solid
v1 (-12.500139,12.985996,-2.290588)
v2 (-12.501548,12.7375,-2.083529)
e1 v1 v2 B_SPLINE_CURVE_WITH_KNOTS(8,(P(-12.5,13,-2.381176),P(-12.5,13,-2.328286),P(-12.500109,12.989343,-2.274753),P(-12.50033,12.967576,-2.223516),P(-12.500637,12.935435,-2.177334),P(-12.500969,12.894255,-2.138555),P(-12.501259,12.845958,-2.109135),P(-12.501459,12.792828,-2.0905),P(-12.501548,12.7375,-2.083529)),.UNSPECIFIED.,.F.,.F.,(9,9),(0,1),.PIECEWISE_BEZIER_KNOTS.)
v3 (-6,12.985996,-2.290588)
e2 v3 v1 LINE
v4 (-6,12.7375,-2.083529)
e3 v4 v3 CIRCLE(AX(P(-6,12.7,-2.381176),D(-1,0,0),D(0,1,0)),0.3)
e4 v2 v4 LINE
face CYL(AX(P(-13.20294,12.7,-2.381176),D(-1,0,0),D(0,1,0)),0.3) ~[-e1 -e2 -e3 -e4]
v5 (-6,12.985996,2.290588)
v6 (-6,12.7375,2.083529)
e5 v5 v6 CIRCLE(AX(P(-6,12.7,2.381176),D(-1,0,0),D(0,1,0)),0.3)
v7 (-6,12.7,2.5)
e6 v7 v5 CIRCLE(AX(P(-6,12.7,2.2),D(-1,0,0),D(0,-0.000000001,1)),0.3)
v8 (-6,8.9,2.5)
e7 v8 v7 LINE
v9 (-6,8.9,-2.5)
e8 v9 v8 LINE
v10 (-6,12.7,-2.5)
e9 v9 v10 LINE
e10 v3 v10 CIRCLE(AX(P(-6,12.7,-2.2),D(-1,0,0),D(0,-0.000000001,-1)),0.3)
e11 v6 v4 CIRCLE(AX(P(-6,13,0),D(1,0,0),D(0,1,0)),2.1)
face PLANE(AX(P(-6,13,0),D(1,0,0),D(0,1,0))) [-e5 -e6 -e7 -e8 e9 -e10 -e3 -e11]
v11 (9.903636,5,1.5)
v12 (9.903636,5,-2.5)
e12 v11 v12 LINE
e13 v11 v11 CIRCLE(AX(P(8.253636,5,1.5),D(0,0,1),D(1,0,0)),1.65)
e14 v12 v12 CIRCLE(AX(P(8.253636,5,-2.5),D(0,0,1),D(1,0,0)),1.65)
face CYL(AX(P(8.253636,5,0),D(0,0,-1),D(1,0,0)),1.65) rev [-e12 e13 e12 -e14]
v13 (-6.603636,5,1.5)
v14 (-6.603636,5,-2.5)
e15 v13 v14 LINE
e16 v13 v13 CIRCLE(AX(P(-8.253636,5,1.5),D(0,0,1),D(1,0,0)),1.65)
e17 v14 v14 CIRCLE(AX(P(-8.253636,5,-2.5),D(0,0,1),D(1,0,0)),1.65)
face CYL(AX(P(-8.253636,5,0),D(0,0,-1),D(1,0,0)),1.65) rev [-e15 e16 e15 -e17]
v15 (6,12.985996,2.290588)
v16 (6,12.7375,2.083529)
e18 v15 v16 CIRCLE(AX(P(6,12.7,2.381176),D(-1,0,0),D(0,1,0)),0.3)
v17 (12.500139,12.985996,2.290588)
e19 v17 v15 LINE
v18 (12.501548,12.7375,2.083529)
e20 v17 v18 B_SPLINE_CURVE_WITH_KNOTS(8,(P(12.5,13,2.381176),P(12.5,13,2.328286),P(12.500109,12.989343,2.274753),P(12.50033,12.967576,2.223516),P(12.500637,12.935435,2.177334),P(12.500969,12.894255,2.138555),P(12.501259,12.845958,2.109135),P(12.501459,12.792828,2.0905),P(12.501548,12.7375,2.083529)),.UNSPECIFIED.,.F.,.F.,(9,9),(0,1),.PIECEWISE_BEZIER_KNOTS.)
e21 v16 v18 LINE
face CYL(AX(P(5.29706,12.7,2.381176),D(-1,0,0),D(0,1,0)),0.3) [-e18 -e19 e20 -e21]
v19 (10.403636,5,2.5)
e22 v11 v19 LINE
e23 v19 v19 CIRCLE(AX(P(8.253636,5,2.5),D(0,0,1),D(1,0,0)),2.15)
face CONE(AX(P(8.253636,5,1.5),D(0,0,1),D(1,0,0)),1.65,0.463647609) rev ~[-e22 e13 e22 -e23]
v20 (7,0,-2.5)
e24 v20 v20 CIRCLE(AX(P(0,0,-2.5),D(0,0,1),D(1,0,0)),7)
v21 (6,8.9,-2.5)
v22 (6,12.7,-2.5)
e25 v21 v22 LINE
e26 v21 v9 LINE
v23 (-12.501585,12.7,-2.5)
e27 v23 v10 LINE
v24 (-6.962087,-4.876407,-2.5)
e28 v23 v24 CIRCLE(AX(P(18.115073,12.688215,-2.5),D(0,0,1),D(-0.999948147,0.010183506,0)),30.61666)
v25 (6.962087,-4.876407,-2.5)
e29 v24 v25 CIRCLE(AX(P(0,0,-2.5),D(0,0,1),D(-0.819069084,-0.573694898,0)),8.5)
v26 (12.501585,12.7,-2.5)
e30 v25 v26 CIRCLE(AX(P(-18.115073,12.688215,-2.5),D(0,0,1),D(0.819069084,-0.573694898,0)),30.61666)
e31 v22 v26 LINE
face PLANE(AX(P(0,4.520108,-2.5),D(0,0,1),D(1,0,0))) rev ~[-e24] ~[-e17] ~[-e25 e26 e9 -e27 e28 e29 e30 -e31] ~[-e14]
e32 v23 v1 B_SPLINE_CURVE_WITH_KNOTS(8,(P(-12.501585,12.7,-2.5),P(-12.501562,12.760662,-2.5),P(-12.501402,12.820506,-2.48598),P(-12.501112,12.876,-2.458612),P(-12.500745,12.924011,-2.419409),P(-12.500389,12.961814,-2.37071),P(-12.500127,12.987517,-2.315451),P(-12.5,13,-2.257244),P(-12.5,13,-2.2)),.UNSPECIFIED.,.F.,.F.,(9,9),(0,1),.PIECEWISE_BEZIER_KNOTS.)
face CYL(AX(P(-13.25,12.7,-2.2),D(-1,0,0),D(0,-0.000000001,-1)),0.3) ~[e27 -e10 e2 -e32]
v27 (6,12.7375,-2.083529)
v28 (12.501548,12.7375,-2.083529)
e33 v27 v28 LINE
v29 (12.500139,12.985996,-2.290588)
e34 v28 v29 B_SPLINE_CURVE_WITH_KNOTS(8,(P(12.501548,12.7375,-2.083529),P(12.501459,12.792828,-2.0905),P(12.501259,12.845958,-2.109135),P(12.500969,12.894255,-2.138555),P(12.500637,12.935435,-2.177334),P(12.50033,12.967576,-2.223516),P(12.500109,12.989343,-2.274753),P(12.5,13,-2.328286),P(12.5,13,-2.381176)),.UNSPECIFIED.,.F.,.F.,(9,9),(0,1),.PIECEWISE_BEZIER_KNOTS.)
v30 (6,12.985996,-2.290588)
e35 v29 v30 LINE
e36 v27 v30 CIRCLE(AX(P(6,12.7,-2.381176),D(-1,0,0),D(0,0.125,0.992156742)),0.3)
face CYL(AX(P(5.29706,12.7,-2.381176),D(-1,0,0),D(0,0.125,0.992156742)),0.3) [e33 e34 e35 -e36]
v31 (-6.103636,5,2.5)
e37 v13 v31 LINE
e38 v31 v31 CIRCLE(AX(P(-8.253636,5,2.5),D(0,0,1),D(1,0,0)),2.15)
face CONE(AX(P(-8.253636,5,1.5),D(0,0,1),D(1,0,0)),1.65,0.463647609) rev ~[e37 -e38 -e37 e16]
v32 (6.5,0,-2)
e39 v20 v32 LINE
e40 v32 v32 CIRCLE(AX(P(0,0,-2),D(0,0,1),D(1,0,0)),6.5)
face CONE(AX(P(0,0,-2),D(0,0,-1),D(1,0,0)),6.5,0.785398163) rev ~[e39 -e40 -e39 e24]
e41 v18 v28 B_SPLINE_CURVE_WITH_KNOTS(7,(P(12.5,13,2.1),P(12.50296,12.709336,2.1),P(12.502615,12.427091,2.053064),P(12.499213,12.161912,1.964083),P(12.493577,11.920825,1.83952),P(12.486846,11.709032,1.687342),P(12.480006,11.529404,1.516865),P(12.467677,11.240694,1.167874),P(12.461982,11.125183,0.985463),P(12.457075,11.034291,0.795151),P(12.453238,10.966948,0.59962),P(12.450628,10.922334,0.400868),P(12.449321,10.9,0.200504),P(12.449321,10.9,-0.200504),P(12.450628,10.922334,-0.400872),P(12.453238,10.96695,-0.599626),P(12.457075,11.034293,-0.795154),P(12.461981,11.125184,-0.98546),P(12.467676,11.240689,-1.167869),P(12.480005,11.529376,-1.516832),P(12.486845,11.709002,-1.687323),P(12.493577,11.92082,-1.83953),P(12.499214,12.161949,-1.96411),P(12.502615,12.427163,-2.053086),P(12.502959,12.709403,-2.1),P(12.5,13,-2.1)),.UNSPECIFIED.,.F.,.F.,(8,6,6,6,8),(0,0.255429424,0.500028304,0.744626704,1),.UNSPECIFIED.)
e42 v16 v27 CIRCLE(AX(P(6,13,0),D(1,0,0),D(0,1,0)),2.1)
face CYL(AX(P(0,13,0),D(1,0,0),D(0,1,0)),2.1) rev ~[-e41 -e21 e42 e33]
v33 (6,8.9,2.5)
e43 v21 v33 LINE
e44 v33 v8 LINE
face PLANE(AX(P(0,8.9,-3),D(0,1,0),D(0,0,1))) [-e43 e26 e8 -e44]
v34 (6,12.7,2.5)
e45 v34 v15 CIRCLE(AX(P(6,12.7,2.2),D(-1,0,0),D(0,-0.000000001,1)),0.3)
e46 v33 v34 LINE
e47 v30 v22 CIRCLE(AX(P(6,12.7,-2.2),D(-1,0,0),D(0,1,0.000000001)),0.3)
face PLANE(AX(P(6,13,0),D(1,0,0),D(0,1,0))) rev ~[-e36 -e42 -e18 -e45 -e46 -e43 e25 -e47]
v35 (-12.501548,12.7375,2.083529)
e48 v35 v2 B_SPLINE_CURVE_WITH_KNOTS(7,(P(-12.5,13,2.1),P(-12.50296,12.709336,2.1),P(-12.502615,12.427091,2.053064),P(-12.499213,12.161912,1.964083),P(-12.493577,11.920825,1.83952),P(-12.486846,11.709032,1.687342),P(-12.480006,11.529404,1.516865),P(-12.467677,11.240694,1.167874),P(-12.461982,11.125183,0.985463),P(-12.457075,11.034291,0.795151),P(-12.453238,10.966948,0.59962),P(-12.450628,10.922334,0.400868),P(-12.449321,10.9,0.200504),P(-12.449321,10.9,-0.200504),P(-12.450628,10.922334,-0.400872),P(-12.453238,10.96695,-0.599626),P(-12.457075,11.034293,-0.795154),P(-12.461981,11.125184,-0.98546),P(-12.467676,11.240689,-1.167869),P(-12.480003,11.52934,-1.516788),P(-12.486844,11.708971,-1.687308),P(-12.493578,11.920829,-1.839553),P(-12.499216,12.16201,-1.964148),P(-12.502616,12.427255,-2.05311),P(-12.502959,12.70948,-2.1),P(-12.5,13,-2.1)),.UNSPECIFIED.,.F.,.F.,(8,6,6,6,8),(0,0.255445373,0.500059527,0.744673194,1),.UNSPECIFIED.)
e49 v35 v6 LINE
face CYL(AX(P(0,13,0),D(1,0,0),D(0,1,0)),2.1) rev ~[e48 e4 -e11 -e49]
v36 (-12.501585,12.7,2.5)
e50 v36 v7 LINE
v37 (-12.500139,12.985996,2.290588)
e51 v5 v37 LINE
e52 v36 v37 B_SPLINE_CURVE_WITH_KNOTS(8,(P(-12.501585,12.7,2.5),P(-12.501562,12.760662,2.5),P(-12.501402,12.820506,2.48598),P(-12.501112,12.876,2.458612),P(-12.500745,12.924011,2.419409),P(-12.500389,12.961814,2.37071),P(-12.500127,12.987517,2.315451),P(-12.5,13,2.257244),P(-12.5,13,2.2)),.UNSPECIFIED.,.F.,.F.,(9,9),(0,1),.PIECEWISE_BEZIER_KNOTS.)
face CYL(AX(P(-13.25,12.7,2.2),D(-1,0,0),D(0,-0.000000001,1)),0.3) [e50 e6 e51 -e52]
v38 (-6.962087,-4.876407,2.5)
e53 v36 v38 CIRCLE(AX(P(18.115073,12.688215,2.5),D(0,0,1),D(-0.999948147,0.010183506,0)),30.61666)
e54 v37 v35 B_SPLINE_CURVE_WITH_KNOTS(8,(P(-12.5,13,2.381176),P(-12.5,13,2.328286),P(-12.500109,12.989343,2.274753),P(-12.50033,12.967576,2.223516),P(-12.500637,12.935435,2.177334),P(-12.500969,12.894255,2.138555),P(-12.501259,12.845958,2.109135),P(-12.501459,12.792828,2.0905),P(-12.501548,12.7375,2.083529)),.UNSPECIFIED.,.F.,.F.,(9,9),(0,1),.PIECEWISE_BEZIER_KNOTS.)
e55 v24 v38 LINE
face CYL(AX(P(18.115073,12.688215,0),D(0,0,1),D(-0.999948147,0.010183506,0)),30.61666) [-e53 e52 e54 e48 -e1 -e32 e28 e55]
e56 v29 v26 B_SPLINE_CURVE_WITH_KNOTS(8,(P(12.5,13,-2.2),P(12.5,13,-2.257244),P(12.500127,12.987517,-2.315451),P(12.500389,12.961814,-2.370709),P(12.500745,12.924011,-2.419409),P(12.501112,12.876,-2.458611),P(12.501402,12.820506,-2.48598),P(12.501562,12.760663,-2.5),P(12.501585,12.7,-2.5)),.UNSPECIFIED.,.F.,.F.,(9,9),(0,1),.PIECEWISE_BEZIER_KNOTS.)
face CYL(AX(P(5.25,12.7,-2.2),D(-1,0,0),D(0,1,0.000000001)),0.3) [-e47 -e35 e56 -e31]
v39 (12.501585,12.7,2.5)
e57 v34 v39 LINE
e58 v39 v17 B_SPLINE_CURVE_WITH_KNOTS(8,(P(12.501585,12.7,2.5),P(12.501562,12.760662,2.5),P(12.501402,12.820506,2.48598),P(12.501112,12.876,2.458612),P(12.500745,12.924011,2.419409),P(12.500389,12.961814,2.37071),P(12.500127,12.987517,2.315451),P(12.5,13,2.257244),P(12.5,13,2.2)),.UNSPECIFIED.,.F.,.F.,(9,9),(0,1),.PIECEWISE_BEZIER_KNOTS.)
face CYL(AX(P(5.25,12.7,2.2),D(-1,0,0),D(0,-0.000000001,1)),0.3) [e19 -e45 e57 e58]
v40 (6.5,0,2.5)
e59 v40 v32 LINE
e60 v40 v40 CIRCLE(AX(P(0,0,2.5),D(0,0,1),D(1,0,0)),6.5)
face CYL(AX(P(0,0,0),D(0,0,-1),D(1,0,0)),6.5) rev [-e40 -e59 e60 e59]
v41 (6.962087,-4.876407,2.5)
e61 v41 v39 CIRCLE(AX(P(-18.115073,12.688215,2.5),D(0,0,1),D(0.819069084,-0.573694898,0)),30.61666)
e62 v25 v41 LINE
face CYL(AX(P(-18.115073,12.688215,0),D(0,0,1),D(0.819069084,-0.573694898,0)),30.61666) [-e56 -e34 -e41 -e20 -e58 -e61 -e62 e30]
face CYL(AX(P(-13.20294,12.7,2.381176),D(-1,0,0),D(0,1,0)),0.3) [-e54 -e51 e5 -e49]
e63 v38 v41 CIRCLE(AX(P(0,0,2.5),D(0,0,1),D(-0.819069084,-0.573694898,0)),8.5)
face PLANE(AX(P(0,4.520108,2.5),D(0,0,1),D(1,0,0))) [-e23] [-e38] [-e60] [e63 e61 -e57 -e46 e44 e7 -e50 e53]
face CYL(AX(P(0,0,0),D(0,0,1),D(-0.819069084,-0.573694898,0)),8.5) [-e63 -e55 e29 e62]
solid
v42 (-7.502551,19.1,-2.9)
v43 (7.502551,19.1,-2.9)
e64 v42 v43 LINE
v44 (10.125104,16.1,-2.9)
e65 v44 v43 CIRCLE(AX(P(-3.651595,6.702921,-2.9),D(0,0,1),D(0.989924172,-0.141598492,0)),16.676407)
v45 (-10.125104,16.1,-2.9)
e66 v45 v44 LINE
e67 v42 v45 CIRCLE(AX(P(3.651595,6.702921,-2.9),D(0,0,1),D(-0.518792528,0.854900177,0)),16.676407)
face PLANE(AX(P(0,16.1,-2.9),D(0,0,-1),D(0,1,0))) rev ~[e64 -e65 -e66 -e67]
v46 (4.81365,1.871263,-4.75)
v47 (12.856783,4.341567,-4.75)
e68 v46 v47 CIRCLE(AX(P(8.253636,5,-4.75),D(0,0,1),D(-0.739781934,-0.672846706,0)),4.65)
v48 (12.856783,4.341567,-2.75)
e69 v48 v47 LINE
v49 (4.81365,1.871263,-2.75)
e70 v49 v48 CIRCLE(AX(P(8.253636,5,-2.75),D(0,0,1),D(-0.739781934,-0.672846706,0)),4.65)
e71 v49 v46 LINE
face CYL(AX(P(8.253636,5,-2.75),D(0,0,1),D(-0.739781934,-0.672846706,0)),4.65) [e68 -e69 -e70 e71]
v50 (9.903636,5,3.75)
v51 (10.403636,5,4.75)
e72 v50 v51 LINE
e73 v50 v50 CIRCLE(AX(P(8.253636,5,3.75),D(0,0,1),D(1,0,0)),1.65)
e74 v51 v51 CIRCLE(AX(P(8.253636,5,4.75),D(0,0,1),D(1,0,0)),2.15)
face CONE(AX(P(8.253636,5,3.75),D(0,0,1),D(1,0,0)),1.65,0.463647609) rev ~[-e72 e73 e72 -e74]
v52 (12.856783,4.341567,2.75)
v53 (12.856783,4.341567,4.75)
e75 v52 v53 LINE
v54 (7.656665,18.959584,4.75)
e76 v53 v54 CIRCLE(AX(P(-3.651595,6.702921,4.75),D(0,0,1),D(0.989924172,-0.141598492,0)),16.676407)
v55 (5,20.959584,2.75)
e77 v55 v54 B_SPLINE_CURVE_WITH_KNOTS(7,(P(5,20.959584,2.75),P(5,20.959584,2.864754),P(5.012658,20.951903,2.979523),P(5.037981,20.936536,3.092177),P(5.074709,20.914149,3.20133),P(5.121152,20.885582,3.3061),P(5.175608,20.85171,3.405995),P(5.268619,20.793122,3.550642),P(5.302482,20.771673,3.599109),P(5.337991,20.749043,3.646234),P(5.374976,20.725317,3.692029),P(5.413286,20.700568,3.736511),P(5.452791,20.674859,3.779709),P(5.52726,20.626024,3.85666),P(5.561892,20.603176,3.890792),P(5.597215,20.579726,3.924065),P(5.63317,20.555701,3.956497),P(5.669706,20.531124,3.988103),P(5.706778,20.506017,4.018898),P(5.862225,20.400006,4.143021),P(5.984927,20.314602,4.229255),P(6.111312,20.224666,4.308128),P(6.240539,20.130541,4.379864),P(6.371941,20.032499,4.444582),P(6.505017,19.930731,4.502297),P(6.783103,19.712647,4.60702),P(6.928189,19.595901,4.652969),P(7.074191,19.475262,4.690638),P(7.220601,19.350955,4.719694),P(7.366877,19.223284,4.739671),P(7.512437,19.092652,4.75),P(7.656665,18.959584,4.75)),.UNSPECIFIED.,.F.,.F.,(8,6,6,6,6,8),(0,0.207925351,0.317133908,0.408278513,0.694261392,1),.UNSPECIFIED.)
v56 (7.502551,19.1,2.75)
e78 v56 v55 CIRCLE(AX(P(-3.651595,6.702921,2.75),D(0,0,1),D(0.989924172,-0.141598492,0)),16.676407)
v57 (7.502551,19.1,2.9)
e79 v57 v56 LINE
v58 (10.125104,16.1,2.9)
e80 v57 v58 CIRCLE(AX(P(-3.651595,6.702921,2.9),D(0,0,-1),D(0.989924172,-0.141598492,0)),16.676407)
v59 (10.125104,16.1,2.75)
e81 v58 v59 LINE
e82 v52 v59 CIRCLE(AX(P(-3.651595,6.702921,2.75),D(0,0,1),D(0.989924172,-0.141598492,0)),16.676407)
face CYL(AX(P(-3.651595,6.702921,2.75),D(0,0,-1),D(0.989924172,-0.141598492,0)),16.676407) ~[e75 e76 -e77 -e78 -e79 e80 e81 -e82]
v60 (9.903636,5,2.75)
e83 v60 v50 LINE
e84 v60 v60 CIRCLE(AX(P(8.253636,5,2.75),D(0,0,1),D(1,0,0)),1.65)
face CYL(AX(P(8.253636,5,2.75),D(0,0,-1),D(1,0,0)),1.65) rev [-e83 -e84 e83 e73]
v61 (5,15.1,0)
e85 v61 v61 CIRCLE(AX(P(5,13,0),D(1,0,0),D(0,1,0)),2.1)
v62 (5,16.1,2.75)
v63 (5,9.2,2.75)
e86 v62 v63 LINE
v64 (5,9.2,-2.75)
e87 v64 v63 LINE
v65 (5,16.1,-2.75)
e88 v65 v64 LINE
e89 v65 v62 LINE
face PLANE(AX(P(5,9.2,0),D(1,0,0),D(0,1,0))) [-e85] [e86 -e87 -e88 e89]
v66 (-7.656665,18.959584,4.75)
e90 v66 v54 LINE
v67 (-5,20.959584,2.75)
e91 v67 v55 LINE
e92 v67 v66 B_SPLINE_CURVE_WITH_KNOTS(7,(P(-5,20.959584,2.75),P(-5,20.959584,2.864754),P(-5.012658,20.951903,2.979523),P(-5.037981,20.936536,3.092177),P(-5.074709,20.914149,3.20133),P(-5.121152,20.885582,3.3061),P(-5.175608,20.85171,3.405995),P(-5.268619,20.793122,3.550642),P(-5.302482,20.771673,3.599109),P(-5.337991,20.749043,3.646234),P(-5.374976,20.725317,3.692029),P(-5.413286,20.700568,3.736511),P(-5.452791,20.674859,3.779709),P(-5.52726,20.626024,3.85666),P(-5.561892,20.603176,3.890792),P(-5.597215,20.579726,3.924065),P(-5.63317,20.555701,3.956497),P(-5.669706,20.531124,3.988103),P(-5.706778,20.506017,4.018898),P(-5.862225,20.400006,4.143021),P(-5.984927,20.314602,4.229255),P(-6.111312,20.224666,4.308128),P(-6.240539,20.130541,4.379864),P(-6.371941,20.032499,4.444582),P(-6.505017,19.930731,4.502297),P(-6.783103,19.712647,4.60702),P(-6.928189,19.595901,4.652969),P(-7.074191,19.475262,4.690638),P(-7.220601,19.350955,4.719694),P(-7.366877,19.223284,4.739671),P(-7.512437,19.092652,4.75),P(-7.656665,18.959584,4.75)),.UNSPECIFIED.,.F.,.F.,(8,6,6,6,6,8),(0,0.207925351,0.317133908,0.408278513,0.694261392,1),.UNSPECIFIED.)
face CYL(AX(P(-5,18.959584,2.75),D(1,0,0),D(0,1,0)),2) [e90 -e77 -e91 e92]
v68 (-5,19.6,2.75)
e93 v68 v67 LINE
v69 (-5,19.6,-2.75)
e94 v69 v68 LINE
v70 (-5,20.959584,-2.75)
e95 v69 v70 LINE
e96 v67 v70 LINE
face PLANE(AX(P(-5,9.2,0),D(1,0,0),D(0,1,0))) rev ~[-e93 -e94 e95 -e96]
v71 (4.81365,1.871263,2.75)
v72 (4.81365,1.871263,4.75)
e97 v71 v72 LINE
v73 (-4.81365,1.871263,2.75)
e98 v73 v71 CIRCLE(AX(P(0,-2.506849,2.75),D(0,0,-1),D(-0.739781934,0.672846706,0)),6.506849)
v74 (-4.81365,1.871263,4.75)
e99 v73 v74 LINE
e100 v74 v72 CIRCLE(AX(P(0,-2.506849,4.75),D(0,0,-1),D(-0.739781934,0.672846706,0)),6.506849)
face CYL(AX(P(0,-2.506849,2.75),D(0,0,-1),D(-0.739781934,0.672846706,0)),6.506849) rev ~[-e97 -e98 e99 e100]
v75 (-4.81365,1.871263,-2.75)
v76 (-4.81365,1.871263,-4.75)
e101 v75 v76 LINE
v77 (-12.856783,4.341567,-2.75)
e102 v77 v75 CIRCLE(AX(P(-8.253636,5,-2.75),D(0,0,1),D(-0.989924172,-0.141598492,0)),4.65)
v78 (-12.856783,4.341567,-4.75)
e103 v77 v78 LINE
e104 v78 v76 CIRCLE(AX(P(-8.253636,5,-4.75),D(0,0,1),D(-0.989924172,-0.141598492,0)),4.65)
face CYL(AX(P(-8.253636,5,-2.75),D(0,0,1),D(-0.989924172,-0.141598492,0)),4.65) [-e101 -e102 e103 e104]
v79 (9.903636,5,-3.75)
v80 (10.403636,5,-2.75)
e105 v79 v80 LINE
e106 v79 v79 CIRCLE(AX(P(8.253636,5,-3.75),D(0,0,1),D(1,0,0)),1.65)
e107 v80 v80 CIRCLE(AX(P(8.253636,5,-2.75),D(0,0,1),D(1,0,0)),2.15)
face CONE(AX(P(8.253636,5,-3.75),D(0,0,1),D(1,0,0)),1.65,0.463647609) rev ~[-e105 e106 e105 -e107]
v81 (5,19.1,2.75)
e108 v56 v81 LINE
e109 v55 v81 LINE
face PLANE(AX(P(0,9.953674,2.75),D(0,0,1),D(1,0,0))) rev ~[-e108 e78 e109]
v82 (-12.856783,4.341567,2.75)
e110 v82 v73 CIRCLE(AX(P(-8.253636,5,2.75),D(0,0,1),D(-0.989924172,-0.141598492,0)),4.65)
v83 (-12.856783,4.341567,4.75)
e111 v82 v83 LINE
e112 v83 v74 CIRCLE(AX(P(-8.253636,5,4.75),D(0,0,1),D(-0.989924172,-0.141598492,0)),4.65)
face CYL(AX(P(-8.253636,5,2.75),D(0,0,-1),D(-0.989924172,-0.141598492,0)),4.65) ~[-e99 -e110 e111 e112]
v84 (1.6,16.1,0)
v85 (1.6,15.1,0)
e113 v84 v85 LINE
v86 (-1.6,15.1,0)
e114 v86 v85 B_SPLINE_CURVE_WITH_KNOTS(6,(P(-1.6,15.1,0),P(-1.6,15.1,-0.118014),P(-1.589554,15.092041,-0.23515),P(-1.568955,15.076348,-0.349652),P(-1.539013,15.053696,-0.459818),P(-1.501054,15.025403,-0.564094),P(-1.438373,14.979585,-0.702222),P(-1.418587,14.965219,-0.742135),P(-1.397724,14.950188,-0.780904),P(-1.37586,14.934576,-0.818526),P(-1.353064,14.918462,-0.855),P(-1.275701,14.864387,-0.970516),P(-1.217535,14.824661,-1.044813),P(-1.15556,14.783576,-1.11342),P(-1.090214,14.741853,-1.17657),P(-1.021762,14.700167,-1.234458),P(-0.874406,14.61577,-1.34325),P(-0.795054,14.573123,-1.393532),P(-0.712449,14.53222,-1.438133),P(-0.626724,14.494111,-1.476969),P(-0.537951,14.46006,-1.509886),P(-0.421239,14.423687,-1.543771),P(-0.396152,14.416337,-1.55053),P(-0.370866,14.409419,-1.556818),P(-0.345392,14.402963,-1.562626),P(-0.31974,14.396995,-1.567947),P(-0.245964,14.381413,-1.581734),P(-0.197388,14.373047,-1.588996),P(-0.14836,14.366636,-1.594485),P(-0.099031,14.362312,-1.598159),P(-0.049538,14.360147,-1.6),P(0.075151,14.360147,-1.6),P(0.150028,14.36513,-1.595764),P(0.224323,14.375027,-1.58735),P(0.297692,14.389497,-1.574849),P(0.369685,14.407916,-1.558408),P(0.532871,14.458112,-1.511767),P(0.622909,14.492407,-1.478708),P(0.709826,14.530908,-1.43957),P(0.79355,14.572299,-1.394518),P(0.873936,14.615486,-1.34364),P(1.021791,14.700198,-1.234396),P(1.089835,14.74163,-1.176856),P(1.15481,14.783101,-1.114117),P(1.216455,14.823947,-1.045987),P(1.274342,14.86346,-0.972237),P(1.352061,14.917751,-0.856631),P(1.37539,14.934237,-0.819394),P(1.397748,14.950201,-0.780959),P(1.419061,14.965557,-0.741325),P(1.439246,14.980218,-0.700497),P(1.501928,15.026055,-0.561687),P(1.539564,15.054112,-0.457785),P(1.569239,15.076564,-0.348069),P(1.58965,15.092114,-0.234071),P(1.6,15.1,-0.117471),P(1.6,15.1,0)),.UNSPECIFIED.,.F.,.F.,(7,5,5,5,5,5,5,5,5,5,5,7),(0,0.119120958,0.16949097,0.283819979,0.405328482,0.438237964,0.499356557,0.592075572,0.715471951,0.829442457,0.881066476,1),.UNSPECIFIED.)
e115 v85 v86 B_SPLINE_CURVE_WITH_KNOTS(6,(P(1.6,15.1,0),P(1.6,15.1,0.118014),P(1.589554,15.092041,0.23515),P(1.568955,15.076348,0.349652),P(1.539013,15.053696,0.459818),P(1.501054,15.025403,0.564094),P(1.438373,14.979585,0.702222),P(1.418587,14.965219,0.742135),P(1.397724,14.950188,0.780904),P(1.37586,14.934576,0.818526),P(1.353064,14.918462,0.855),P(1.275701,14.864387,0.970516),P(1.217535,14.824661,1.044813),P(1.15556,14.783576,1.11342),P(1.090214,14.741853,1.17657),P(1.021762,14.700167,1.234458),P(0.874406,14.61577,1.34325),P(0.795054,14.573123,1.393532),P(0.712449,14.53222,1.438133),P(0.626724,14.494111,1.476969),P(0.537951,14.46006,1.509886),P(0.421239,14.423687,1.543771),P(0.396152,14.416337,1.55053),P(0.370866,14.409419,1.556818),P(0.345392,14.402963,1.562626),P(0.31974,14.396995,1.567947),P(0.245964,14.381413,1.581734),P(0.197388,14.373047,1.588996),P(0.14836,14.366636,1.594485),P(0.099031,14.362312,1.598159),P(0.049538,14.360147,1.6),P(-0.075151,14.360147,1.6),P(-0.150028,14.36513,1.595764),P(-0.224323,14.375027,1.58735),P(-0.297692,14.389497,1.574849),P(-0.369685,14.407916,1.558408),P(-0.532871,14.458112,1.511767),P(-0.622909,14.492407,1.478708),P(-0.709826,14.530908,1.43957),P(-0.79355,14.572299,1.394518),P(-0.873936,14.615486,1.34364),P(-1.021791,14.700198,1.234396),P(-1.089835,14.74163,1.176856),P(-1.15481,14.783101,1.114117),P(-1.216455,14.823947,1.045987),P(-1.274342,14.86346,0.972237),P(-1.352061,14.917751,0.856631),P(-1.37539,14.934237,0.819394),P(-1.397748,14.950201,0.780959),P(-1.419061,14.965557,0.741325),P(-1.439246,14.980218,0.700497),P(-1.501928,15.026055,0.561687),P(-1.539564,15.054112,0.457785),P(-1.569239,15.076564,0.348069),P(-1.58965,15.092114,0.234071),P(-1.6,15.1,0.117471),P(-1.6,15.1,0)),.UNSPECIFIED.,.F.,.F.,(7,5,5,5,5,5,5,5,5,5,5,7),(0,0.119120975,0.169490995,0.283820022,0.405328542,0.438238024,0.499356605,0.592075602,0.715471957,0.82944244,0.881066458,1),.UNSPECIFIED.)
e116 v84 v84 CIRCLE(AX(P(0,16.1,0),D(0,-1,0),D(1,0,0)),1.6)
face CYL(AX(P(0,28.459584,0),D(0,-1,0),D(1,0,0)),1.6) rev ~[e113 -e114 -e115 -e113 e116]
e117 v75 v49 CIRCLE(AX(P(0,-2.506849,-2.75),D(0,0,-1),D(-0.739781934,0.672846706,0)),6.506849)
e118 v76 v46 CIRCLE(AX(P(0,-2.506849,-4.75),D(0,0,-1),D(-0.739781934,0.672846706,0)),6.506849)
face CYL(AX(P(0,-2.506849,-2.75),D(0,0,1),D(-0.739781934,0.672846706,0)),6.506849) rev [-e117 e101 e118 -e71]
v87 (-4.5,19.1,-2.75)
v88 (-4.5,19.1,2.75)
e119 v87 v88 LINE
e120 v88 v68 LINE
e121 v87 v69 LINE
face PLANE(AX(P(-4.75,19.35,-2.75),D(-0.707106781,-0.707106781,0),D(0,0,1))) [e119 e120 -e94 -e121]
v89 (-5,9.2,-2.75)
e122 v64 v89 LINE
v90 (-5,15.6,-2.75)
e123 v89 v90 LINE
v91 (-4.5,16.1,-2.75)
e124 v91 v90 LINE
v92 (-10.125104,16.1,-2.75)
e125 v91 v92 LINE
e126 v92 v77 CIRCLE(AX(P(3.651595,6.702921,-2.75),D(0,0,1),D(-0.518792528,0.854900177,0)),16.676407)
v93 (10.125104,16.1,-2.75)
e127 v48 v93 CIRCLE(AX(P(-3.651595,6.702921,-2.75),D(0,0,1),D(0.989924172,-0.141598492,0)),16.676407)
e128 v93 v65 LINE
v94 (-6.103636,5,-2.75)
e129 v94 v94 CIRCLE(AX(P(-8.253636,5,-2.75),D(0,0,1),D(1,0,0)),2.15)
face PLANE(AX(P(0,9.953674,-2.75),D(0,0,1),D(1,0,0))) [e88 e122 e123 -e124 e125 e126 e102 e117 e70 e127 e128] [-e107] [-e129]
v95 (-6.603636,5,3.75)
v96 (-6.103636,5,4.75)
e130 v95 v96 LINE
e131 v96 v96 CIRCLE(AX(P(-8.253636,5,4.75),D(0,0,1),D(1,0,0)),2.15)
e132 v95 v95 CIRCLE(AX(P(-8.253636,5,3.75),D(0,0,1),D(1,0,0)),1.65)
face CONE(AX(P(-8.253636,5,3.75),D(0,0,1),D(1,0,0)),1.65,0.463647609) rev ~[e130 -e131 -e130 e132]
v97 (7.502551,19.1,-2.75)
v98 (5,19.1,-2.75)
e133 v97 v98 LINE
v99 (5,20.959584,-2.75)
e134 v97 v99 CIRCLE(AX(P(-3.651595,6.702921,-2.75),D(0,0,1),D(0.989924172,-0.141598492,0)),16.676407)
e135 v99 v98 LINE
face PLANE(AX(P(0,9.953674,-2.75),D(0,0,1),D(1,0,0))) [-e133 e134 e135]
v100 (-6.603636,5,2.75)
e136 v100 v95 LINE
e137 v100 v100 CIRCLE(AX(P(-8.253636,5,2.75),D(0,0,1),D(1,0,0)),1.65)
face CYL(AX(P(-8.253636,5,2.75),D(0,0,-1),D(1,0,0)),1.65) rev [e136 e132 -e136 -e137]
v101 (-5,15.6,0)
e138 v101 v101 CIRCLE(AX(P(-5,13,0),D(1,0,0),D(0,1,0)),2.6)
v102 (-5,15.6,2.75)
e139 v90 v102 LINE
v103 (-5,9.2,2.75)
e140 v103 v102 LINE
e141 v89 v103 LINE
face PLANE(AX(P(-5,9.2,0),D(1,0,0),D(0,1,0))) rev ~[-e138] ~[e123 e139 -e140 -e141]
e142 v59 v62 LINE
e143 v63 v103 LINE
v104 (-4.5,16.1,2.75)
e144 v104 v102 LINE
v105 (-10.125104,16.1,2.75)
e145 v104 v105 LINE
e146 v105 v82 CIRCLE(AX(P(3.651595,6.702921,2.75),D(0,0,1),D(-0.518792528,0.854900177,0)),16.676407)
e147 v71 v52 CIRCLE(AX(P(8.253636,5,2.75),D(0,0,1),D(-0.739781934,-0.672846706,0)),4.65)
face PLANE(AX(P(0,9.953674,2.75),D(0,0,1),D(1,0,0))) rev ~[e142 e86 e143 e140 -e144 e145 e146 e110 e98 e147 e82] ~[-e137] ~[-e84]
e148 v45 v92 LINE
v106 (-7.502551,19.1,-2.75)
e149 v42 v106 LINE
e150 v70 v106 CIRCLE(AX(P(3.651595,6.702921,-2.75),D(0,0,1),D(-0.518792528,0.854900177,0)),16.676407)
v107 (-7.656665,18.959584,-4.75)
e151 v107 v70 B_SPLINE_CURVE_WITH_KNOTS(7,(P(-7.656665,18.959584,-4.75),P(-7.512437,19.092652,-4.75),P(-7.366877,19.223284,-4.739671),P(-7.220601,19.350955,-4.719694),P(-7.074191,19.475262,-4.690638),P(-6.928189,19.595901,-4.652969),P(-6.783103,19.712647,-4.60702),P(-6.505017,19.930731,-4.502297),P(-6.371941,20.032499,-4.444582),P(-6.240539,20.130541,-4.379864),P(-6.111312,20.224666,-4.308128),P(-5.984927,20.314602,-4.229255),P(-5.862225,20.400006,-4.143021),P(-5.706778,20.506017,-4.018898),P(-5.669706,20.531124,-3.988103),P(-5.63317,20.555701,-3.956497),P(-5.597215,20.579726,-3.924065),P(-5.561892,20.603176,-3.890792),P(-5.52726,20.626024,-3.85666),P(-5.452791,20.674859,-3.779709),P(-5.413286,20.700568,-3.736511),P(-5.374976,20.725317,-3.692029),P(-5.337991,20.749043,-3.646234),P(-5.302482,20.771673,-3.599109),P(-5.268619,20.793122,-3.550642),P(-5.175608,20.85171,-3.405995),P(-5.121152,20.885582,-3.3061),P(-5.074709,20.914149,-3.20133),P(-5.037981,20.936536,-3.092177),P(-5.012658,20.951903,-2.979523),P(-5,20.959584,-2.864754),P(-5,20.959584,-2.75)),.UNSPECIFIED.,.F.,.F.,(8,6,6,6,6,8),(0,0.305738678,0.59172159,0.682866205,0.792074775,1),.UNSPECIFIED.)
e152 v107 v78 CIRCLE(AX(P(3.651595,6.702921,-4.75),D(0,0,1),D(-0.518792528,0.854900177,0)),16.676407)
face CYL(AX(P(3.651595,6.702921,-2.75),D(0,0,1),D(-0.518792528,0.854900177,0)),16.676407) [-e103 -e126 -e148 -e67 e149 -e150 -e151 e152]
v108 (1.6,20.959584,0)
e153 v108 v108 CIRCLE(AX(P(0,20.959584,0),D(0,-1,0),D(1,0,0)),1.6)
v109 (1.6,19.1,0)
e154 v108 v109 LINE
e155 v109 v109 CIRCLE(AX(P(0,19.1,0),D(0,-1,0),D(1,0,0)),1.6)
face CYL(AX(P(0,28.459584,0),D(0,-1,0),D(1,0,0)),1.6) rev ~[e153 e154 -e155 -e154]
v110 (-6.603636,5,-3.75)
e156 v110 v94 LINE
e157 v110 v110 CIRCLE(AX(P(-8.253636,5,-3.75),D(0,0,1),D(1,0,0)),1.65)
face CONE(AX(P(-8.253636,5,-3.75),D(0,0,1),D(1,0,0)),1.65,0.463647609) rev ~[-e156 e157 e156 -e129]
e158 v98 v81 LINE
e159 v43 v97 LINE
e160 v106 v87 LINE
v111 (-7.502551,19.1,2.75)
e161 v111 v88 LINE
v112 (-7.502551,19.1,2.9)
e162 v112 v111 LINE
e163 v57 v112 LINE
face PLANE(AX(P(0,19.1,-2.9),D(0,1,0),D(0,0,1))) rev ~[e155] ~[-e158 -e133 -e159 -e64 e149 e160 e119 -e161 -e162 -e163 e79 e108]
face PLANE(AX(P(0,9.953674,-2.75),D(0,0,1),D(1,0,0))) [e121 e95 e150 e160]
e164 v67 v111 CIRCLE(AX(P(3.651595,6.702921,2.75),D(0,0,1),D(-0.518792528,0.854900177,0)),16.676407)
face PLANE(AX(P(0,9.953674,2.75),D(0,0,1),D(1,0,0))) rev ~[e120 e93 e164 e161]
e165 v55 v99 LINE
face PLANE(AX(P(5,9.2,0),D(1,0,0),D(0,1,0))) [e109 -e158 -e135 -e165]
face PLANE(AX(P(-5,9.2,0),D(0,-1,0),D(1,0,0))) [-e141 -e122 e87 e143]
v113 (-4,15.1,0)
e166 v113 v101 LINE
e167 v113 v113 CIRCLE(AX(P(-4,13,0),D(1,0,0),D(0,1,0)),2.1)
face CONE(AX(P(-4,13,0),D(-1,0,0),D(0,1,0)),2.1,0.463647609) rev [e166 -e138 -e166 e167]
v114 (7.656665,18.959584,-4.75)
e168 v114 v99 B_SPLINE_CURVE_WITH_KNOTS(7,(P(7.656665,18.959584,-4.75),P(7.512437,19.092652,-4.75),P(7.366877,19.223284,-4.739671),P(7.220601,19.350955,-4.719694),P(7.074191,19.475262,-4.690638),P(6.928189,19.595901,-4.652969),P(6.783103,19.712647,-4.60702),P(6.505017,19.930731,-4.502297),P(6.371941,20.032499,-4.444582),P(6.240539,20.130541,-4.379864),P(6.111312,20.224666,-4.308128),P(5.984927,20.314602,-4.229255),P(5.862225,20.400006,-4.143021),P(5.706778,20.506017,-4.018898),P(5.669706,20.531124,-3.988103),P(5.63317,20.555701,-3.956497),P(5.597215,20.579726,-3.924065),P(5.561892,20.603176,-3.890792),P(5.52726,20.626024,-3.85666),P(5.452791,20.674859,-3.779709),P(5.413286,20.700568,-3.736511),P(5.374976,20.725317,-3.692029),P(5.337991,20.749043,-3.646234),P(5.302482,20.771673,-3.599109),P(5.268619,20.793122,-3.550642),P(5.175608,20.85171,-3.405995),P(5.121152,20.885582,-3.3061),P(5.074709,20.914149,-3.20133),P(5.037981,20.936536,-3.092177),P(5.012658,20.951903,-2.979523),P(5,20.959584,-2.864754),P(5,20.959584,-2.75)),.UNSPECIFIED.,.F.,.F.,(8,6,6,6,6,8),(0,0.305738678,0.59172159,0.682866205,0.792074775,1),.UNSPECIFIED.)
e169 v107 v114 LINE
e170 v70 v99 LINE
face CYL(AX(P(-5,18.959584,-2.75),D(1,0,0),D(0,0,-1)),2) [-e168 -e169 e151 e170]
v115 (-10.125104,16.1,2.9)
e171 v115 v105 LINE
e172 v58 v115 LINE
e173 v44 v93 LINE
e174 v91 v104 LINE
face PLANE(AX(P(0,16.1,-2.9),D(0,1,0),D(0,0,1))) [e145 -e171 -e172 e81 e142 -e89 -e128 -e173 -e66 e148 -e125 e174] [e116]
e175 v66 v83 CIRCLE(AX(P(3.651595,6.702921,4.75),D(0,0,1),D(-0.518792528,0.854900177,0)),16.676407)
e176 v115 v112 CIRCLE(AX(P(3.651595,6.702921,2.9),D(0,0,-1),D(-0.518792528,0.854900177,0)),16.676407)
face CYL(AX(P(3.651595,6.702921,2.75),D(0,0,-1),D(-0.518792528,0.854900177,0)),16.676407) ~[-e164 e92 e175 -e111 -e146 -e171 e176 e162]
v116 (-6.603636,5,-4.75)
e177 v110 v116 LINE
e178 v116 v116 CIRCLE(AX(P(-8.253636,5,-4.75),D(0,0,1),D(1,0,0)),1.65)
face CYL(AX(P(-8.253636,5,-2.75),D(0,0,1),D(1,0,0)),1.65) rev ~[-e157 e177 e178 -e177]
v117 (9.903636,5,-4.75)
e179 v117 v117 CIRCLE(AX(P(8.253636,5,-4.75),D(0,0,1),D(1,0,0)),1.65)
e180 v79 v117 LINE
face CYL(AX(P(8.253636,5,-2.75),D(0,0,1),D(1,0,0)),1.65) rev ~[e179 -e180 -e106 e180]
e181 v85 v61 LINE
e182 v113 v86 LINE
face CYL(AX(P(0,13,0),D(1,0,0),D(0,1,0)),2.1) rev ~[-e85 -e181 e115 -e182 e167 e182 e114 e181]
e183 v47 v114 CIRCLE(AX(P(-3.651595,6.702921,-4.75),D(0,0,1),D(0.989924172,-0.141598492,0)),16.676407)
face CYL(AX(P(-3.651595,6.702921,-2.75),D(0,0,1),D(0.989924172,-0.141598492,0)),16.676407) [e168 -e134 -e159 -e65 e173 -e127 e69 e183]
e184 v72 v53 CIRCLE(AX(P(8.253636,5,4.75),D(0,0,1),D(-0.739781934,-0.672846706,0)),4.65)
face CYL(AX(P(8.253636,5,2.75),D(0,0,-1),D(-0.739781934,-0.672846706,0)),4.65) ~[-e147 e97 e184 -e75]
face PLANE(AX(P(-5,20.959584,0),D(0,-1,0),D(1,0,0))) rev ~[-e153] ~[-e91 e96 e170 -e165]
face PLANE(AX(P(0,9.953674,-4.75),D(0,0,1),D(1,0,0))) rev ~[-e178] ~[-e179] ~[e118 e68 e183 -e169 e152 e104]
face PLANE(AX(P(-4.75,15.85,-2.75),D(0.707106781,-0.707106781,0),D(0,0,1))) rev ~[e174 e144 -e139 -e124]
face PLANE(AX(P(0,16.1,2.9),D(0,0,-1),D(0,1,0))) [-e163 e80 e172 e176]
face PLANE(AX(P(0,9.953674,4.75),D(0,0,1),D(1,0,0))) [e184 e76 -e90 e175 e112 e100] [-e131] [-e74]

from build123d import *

# Parameters (mm, degrees)
F0_R        = 6.5
F0_R_2      = 1.65
F1_DEPTH    = 2.5
F2_R        = 2.1
F3_DEPTH    = 19.8
F2_W        = 8.2
F2_H        = 6
F4_DEPTH    = 6
F5_T1_DEPTH = 7.9058808998
F5_T3_DEPTH = 7.9058808998
F5_T5_DEPTH = 8
F5_T7_DEPTH = 8
F6_SIZE     = 0.5
F7_SIZE2    = 0.5
F7_SIZE     = 1
F7_2_SIZE2  = 0.5
F7_2_SIZE   = 1
F8_W        = 10
F8_H        = 11.7595842183
F9_DEPTH    = 4.75
F10_START   = 2.75
F8_R        = 1.65
F10_DEPTH   = 2
F11_START   = -2.75
F11_DEPTH   = 2
F12_DEPTH   = 12.5
F13_W       = 3
F13_H       = 5.8
F14_DEPTH   = 12.5
F16_D       = 3.2
F16_DEPTH   = 7.5
F16_TIP     = 0.9613769904
F17_SIZE    = 0.5
F18_R       = 2
F19_SIZE2   = 0.5
F19_SIZE    = 1
F19_2_SIZE2 = 0.5
F19_2_SIZE  = 1
F19_3_SIZE2 = 0.5
F19_3_SIZE  = 1
F19_4_SIZE2 = 0.5
F19_4_SIZE  = 1
F20_SIZE2   = 0.5
F20_SIZE    = 1


# Not quite as in the source:
# - a fillet or chamfer that OpenCascade refuses, or shapes differently, is made with other operations: its cross-section is extruded or revolved along the edge and cut away or added


with BuildPart() as f1:
    # F0 (on Top) → F1 (new body, symmetric)
    with BuildSketch(Plane.XY):
        with BuildLine():
            ThreePointArc((-12.5, 13), (-11.1303999816, 3.6282915772), (-6.9620872127, -4.8764066323))
            ThreePointArc((-6.9620872127, -4.8764066323), (0, -8.5), (6.9620872127, -4.8764066323))
            ThreePointArc((6.9620872127, -4.8764066323), (11.1303999816, 3.6282915772), (12.5, 13))
            Line((12.5, 13), (-12.5, 13))
        make_face()
        Circle(F0_R, mode=Mode.SUBTRACT)
        with Locations((-8.2536355626, 5)):
            Circle(F0_R_2, mode=Mode.SUBTRACT)
        with Locations((8.2536355626, 5)):
            Circle(F0_R_2, mode=Mode.SUBTRACT)
    extrude(amount=F1_DEPTH, both=True)

    # F2 (on Right) → F3 (cut, symmetric)
    with BuildSketch(Plane.YZ):
        with Locations((13, 0)):
            Circle(F2_R)
    extrude(amount=F3_DEPTH, both=True, mode=Mode.SUBTRACT)

    # F2 (on Right) → F4 (cut, symmetric)
    with BuildSketch(Plane.YZ):
        with Locations((13, 0)):
            Rectangle(F2_W, F2_H)
        with Locations((13, 0)):
            Circle(F2_R, mode=Mode.SUBTRACT)
    extrude(amount=F4_DEPTH, both=True, mode=Mode.SUBTRACT)

    # F5: fillet of radius 0.3 on 8 edges, made by hand

    # F5_s2 → F5_t1 (cut)
    with BuildSketch(Plane.YZ.offset(5.2970595501)):
        with BuildLine():
            ThreePointArc((13, 2.38117618), (12.925, 2.1827448316), (12.7375, 2.0835291575))
            ThreePointArc((12.7375, 2.0835291575), (12.8684918837, 2.0958782444), (13, 2.1))
            Line((13, 2.1), (13, 2.38117618))
        make_face()
        with BuildLine():
            ThreePointArc((12.7375, -2.0835291575), (12.925, -2.1827448316), (13, -2.38117618))
            Line((13, -2.38117618), (13, -2.1))
            ThreePointArc((13, -2.1), (12.8684918837, -2.0958782444), (12.7375, -2.0835291575))
        make_face()
    extrude(amount=F5_T1_DEPTH, mode=Mode.SUBTRACT)

    # F5_s4 → F5_t3 (cut)
    with BuildSketch(Plane.YZ.offset(-13.2029404499)):
        with BuildLine():
            ThreePointArc((13, 2.38117618), (12.925, 2.1827448316), (12.7375, 2.0835291575))
            ThreePointArc((12.7375, 2.0835291575), (12.8684918837, 2.0958782444), (13, 2.1))
            Line((13, 2.1), (13, 2.38117618))
        make_face()
        with BuildLine():
            ThreePointArc((13, -2.38117618), (12.925, -2.1827448316), (12.7375, -2.0835291575))
            ThreePointArc((12.7375, -2.0835291575), (12.8684918837, -2.0958782444), (13, -2.1))
            Line((13, -2.1), (13, -2.38117618))
        make_face()
    extrude(amount=F5_T3_DEPTH, mode=Mode.SUBTRACT)

    # F5_s6 → F5_t5 (cut)
    with BuildSketch(Plane.YZ.offset(-13.25)):
        with BuildLine():
            ThreePointArc((12.7, 2.5), (12.9121320344, 2.4121320344), (13, 2.2))
            Line((13, 2.2), (13, 2.5))
            Line((13, 2.5), (12.7, 2.5))
        make_face()
        with BuildLine():
            ThreePointArc((12.7, -2.5), (12.9121320344, -2.4121320344), (13, -2.2))
            Line((13, -2.2), (13, -2.5))
            Line((13, -2.5), (12.7, -2.5))
        make_face()
    extrude(amount=F5_T5_DEPTH, mode=Mode.SUBTRACT)

    # F5_s8 → F5_t7 (cut)
    with BuildSketch(Plane.YZ.offset(5.25)):
        with BuildLine():
            ThreePointArc((12.7, 2.5), (12.9121320344, 2.4121320344), (13, 2.2))
            Line((13, 2.2), (13, 2.5))
            Line((13, 2.5), (12.7, 2.5))
        make_face()
        with BuildLine():
            ThreePointArc((13, -2.2), (12.9121320344, -2.4121320344), (12.7, -2.5))
            Line((12.7, -2.5), (13, -2.5))
            Line((13, -2.5), (13, -2.2))
        make_face()
    extrude(amount=F5_T7_DEPTH, mode=Mode.SUBTRACT)

    # F6
    f6_edges = [f1.edges().sort_by_distance(p)[0] for p in [
        (-6.5, 0, -2.5),
    ]]
    chamfer(f6_edges, length=F6_SIZE)

    # F7
    f7_edges = [f1.edges().sort_by_distance(p)[0] for p in [
        (-9.903636, 5, 2.5),
    ]]
    f7_side = f1.faces().sort_by_distance((-9.903636, 5, 0))[0]
    chamfer(f7_edges, length=F7_SIZE, length2=F7_SIZE2, reference=f7_side)

    # F7#2
    f7_2_edges = [f1.edges().sort_by_distance(p)[0] for p in [
        (6.603636, 5, 2.5),
    ]]
    f7_2_side = f1.faces().sort_by_distance((6.603636, 5, 0))[0]
    chamfer(f7_2_edges, length=F7_2_SIZE, length2=F7_2_SIZE2, reference=f7_2_side)


with BuildPart() as f9:
    # F8 (on Top) → F9 (new body, symmetric)
    with BuildSketch(Plane.XY):
        with Locations((0, 15.0797921091)):
            Rectangle(F8_W, F8_H)
    extrude(amount=F9_DEPTH, both=True)

    # F8 (on Top) → F10 (join)
    with BuildSketch(Plane.XY.offset(F10_START)):
        with BuildLine():
            Line((5, 20.9595842183), (5, 9.2))
            Line((5, 9.2), (-5, 9.2))
            Line((-5, 9.2), (-5, 20.9595842183))
            ThreePointArc((-5, 20.9595842183), (-11.4247335497, 13.830813762), (-12.8567829642, 4.3415670122))
            ThreePointArc((-12.8567829642, 4.3415670122), (-9.6188596548, 0.5549282145), (-4.8136495699, 1.8712628154))
            ThreePointArc((-4.8136495699, 1.8712628154), (0, 4), (4.8136495699, 1.8712628154))
            ThreePointArc((4.8136495699, 1.8712628154), (9.6188596548, 0.5549282145), (12.8567829642, 4.3415670122))
            ThreePointArc((12.8567829642, 4.3415670122), (11.4247335497, 13.830813762), (5, 20.9595842183))
        make_face()
        with Locations((-8.2536355626, 5)):
            Circle(F8_R, mode=Mode.SUBTRACT)
        with Locations((8.2536355626, 5)):
            Circle(F8_R, mode=Mode.SUBTRACT)
    extrude(amount=F10_DEPTH)

    # F8 (on Top) → F11 (join)
    with BuildSketch(Plane.XY.offset(F11_START)):
        with BuildLine():
            Line((5, 20.9595842183), (5, 9.2))
            Line((5, 9.2), (-5, 9.2))
            Line((-5, 9.2), (-5, 20.9595842183))
            ThreePointArc((-5, 20.9595842183), (-11.4247335497, 13.830813762), (-12.8567829642, 4.3415670122))
            ThreePointArc((-12.8567829642, 4.3415670122), (-9.6188596548, 0.5549282145), (-4.8136495699, 1.8712628154))
            ThreePointArc((-4.8136495699, 1.8712628154), (0, 4), (4.8136495699, 1.8712628154))
            ThreePointArc((4.8136495699, 1.8712628154), (9.6188596548, 0.5549282145), (12.8567829642, 4.3415670122))
            ThreePointArc((12.8567829642, 4.3415670122), (11.4247335497, 13.830813762), (5, 20.9595842183))
        make_face()
        with Locations((-8.2536355626, 5)):
            Circle(F8_R, mode=Mode.SUBTRACT)
        with Locations((8.2536355626, 5)):
            Circle(F8_R, mode=Mode.SUBTRACT)
    extrude(amount=-F11_DEPTH)

    # F2 (on Right) → F12 (cut, symmetric)
    with BuildSketch(Plane.YZ):
        with Locations((13, 0)):
            Circle(F2_R)
    extrude(amount=F12_DEPTH, both=True, mode=Mode.SUBTRACT)

    # F13 (on Right) → F14 (cut, symmetric)
    with BuildSketch(Plane.YZ):
        with Locations((17.6, 0)):
            Rectangle(F13_W, F13_H)
    extrude(amount=F14_DEPTH, both=True, mode=Mode.SUBTRACT)

    # F16
    with Locations(Plane(origin=(0, 20.9595842183, 0), x_dir=(-1, 0, 0), z_dir=(0, 1, 0))):
        with Locations((0, 0)):
            Hole(F16_D / 2, depth=F16_DEPTH)
            with Locations((0, 0, -(F16_DEPTH + F16_TIP / 2))):  # 118° drill point
                Cone(0, F16_D / 2, F16_TIP, mode=Mode.SUBTRACT)

    # F17
    f17_edges = [f9.edges().sort_by_distance(p)[0] for p in [
        (-5, 16.1, 0),
        (-5, 19.1, 0),
    ]]
    chamfer(f17_edges, length=F17_SIZE)

    # F18
    f18_edges = [f9.edges().sort_by_distance(p)[0] for p in [
        (0, 20.959584, -4.75),
        (0, 20.959584, 4.75),
    ]]
    fillet(f18_edges, radius=F18_R)

    # F19
    f19_edges = [f9.edges().sort_by_distance(p)[0] for p in [
        (-9.903636, 5, -2.75),
    ]]
    f19_side = f9.faces().sort_by_distance((-9.903636, 5, -3.75))[0]
    chamfer(f19_edges, length=F19_SIZE, length2=F19_SIZE2, reference=f19_side)

    # F19#2
    f19_2_edges = [f9.edges().sort_by_distance(p)[0] for p in [
        (6.603636, 5, -2.75),
    ]]
    f19_2_side = f9.faces().sort_by_distance((6.603636, 5, -3.75))[0]
    chamfer(f19_2_edges, length=F19_2_SIZE, length2=F19_2_SIZE2, reference=f19_2_side)

    # F19#3
    f19_3_edges = [f9.edges().sort_by_distance(p)[0] for p in [
        (-9.903636, 5, 4.75),
    ]]
    f19_3_side = f9.faces().sort_by_distance((-9.903636, 5, 3.75))[0]
    chamfer(f19_3_edges, length=F19_3_SIZE, length2=F19_3_SIZE2, reference=f19_3_side)

    # F19#4
    f19_4_edges = [f9.edges().sort_by_distance(p)[0] for p in [
        (6.603636, 5, 4.75),
    ]]
    f19_4_side = f9.faces().sort_by_distance((6.603636, 5, 3.75))[0]
    chamfer(f19_4_edges, length=F19_4_SIZE, length2=F19_4_SIZE2, reference=f19_4_side)

    # F20
    f20_edges = [f9.edges().sort_by_distance(p)[0] for p in [
        (-5, 10.9, 0),
    ]]
    f20_side = f9.faces().sort_by_distance((0, 10.9, 0))[0]
    chamfer(f20_edges, length=F20_SIZE, length2=F20_SIZE2, reference=f20_side)


solid = Compound([f1.part, f9.part])
